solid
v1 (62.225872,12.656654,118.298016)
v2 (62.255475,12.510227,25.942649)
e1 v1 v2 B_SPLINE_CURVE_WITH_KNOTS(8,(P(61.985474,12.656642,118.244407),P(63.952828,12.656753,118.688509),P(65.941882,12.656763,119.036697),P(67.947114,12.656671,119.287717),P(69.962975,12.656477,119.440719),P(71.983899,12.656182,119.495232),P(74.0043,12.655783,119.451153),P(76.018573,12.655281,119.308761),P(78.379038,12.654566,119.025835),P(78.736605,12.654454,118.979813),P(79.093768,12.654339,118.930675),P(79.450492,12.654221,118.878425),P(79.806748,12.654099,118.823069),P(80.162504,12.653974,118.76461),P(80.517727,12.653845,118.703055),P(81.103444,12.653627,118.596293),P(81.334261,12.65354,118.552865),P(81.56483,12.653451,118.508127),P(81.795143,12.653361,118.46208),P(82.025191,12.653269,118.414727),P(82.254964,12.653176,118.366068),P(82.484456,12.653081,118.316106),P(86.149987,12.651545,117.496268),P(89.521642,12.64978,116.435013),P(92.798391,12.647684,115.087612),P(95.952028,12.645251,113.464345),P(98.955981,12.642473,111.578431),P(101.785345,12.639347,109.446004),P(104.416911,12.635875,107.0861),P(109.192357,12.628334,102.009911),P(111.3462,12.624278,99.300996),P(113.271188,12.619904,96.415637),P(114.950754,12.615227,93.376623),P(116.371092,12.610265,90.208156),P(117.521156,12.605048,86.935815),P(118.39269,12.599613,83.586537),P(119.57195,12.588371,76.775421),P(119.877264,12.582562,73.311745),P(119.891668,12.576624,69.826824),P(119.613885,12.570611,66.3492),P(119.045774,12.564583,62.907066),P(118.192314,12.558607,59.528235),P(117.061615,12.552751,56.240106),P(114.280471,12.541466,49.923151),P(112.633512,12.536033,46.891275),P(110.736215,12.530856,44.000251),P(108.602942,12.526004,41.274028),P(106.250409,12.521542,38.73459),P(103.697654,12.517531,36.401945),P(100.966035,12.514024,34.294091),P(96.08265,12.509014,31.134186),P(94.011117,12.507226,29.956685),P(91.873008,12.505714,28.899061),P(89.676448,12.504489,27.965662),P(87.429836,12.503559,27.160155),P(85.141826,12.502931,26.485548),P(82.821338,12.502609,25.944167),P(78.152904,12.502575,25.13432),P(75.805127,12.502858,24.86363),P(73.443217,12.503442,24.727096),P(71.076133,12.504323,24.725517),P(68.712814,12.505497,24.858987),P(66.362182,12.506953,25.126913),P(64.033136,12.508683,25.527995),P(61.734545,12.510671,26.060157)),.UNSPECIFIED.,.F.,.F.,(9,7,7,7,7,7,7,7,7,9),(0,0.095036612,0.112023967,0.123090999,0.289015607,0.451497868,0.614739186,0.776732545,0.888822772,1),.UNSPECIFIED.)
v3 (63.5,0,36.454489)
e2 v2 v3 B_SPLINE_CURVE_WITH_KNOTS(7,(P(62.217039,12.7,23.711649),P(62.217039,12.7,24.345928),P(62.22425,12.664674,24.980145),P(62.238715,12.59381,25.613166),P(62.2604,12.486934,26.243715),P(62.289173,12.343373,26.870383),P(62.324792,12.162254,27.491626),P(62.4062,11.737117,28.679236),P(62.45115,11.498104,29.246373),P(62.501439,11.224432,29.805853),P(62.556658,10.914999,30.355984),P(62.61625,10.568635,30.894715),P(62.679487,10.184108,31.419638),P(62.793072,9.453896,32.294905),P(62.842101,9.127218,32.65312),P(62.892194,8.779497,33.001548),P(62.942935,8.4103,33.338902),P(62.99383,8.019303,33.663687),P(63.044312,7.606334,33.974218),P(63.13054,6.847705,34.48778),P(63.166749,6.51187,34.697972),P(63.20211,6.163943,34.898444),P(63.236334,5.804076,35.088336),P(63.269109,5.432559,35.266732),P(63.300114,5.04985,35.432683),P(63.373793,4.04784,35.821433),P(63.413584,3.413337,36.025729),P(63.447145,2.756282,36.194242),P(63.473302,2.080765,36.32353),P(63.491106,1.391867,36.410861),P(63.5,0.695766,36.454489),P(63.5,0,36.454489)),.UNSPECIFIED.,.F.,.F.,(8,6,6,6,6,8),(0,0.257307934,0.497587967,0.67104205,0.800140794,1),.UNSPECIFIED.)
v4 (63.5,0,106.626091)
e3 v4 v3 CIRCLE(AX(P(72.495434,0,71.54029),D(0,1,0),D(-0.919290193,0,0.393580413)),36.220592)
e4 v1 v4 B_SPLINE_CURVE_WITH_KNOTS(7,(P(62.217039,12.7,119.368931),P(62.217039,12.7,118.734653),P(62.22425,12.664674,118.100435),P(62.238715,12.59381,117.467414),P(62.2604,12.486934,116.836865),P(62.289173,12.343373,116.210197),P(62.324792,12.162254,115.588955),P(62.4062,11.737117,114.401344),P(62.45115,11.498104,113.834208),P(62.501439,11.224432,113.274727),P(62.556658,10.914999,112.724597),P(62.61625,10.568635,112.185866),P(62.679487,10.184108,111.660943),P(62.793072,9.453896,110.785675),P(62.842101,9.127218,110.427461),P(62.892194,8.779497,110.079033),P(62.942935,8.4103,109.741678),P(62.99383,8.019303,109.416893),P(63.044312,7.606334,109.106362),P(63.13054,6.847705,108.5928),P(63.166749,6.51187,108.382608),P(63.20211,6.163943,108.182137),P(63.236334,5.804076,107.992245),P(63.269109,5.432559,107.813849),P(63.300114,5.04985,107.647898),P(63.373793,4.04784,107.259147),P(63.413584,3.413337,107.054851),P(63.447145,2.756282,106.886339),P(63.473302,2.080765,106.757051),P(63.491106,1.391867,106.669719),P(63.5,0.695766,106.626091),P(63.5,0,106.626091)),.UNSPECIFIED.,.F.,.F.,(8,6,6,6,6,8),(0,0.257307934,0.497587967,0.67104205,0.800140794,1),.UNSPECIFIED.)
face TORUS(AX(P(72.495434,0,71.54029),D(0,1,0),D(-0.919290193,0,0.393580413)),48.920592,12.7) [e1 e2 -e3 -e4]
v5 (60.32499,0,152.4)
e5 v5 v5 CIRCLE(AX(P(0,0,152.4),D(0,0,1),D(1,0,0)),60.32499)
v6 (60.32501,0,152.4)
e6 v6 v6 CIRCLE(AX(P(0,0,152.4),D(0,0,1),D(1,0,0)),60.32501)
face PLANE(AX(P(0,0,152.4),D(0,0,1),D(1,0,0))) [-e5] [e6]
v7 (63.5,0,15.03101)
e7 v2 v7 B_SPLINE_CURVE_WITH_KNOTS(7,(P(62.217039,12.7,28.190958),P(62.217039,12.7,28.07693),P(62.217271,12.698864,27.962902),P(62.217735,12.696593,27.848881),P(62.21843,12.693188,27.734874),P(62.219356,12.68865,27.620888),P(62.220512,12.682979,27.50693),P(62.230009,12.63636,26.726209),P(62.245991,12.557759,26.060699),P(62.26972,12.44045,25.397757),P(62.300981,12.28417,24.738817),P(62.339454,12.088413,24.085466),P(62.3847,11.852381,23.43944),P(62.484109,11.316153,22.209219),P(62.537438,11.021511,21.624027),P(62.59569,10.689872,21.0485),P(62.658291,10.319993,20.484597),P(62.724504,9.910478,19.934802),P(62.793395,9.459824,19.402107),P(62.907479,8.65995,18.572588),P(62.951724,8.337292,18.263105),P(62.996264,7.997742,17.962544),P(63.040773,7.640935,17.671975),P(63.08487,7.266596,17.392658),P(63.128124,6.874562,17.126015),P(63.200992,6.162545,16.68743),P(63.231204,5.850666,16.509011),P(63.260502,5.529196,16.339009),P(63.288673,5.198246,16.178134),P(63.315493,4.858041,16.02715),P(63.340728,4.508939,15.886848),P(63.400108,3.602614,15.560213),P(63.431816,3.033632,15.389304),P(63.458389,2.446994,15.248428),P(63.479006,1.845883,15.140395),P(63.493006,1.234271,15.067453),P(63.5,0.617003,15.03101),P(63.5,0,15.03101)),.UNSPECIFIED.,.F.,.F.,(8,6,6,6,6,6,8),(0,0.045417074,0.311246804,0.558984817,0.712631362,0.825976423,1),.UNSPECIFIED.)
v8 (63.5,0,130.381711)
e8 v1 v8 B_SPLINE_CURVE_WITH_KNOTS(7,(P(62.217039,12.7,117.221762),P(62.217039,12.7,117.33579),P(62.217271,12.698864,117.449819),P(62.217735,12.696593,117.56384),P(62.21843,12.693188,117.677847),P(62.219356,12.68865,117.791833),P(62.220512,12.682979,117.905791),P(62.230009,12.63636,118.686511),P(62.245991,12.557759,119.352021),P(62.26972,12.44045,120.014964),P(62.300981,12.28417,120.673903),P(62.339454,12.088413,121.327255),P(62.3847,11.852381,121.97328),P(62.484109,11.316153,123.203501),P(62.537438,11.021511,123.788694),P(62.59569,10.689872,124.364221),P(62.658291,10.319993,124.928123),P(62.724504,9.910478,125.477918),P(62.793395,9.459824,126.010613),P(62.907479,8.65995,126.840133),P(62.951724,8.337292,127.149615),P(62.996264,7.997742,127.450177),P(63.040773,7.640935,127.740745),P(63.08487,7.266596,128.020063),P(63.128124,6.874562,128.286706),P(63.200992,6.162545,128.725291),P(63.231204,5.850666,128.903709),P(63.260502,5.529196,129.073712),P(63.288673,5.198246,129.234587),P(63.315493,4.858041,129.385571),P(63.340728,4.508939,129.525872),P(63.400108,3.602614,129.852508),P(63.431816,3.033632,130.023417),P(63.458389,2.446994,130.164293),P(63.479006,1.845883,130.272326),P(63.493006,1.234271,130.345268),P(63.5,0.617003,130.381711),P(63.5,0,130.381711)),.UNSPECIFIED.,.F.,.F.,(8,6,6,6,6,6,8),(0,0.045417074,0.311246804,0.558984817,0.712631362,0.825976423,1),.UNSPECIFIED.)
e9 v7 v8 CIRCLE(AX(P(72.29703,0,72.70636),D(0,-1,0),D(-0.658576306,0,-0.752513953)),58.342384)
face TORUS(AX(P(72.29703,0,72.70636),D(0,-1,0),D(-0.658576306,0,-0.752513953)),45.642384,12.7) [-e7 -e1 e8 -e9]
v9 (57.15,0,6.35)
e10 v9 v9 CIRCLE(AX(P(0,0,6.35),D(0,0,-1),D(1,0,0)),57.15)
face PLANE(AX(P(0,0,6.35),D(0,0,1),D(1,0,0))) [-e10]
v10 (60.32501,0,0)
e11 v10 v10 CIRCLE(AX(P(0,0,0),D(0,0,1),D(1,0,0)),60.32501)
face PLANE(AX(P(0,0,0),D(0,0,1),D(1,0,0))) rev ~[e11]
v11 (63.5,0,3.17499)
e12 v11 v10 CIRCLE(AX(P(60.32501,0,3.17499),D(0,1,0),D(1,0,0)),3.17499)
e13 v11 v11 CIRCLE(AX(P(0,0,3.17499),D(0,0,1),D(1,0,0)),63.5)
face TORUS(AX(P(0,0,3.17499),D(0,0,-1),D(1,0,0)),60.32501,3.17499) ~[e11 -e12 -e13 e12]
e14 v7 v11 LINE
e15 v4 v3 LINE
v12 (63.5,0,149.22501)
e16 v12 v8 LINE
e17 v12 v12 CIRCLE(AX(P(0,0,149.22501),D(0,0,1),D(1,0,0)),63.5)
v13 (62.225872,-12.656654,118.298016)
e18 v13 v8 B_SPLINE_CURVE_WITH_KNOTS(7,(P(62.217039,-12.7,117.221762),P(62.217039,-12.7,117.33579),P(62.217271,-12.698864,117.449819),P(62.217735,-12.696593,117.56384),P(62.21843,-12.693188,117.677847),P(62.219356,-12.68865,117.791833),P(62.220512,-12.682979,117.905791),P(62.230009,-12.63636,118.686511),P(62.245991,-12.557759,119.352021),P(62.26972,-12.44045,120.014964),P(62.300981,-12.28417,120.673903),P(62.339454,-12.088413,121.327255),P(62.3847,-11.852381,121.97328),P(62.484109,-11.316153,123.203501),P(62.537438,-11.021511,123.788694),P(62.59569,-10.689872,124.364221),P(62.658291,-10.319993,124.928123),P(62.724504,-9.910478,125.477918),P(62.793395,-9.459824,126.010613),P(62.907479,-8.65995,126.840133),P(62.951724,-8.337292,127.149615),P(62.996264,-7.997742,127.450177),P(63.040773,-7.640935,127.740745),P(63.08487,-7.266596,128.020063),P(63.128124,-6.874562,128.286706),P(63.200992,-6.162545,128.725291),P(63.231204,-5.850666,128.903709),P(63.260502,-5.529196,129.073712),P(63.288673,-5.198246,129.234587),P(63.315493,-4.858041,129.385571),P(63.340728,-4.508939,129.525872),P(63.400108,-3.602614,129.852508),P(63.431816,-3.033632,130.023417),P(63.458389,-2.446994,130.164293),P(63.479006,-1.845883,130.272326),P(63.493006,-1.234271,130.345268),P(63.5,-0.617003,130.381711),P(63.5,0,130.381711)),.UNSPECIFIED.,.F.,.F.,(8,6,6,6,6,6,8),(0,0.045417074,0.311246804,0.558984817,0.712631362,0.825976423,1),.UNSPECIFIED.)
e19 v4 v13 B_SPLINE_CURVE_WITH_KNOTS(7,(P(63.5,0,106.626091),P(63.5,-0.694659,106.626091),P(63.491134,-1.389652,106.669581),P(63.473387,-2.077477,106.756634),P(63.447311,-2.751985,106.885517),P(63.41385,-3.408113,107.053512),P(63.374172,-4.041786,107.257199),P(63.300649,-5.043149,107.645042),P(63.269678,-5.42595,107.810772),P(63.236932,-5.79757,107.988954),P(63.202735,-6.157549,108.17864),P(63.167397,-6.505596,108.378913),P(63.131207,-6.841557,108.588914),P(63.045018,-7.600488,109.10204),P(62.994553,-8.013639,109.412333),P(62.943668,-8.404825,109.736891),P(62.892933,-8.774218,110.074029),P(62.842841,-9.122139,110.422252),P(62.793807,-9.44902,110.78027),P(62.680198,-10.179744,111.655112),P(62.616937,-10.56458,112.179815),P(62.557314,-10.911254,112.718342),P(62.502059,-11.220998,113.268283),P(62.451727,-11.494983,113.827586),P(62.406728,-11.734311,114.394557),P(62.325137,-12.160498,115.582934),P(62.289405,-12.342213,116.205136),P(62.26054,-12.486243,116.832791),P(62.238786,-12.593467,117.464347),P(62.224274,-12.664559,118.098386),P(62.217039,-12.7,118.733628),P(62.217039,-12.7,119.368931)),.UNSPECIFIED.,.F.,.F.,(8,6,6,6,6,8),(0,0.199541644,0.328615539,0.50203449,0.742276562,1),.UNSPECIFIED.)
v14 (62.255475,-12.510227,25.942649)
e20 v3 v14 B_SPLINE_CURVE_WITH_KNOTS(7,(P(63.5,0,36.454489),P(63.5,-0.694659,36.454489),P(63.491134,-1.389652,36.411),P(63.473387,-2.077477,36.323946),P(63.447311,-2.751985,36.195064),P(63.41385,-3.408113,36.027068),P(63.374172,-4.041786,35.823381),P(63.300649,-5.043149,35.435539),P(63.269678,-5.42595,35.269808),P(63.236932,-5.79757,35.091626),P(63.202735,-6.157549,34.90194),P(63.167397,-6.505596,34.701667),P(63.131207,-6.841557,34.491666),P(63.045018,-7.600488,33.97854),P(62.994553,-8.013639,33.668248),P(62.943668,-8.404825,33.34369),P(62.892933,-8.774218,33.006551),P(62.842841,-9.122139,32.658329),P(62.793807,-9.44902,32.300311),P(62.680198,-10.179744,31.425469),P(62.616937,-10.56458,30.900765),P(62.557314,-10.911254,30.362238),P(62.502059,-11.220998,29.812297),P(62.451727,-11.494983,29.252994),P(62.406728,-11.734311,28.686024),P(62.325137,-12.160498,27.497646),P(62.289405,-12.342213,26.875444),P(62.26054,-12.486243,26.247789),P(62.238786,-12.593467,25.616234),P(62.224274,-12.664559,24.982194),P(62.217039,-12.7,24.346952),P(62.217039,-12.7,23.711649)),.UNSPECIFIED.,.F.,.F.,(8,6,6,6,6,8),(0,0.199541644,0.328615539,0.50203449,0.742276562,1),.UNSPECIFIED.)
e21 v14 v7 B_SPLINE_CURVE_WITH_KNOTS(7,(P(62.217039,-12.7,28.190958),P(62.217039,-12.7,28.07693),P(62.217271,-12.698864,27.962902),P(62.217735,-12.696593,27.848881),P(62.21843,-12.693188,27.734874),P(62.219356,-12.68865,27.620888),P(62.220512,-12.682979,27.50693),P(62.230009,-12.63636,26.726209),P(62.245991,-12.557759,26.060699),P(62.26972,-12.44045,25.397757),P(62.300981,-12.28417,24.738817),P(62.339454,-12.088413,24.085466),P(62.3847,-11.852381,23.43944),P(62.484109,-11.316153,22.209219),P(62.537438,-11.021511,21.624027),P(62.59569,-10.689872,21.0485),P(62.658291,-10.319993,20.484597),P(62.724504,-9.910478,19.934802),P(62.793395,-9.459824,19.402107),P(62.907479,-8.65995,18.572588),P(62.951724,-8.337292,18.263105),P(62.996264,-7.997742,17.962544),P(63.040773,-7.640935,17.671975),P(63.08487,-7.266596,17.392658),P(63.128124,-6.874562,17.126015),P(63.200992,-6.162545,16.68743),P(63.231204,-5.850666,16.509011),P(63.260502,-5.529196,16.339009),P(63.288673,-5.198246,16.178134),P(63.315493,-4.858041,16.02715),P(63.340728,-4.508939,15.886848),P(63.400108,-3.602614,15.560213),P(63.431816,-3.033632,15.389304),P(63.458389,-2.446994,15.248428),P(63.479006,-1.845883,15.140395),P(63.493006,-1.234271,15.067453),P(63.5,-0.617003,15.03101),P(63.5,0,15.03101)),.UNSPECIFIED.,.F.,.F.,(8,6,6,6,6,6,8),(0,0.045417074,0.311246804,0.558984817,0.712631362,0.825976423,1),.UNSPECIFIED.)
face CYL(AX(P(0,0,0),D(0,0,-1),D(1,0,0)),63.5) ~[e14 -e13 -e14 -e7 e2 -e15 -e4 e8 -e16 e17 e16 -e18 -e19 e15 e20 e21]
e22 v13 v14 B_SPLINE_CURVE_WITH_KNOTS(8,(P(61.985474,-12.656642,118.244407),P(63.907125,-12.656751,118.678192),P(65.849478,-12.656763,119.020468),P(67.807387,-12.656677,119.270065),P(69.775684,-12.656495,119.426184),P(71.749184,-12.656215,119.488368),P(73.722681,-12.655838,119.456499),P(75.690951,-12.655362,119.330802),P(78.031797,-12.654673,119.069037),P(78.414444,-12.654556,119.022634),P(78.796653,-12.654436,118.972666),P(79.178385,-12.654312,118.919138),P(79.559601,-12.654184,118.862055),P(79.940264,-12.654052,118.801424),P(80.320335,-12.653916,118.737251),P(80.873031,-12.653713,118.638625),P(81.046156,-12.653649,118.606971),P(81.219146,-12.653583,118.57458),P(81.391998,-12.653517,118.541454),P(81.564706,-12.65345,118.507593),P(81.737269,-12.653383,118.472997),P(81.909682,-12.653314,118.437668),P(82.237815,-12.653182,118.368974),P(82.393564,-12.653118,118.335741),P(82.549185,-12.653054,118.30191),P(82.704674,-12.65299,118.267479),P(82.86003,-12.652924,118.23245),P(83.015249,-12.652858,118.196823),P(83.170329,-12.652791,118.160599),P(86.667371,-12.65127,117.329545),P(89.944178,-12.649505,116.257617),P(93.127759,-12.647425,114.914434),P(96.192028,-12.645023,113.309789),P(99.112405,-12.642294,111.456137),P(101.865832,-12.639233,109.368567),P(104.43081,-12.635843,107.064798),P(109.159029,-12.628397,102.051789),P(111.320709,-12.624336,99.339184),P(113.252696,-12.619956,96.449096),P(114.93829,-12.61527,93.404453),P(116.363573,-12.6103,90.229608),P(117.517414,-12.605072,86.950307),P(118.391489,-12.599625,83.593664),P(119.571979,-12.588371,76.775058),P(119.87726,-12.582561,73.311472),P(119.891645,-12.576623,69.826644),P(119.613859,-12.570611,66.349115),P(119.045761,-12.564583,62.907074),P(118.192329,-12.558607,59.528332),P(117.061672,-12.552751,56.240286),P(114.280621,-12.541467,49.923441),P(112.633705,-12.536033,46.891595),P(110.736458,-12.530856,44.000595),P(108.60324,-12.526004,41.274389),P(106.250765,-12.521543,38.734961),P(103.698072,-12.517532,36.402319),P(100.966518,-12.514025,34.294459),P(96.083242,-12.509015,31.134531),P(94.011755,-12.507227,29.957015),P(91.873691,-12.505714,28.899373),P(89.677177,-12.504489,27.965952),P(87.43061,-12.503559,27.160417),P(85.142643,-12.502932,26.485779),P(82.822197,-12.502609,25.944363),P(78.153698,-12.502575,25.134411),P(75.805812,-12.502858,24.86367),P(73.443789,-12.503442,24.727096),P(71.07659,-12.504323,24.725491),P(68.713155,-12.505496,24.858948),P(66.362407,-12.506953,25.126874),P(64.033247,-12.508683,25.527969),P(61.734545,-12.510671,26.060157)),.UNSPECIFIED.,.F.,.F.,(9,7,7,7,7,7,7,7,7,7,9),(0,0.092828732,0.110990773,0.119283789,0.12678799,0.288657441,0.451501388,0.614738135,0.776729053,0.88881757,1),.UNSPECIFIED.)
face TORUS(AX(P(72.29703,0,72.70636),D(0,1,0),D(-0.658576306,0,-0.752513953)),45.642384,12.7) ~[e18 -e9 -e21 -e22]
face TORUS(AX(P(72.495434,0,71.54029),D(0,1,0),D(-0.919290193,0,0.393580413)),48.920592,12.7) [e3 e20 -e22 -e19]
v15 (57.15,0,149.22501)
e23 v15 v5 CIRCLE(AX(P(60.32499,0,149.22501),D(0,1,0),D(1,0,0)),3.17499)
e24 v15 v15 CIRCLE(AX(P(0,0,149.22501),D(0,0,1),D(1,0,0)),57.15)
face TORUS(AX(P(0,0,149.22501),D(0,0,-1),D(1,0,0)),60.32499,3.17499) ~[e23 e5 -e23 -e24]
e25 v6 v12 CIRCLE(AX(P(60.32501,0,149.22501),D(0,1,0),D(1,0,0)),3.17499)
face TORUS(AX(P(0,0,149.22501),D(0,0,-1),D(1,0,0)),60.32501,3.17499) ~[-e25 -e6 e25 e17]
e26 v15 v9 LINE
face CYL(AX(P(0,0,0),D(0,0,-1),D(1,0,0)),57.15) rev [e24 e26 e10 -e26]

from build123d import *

# Parameters (mm, degrees)
F0_R         = 63.5
F2_DEPTH     = 152.4
F3_T         = -6.35
F4_DEPTH     = 12.7
F5_DEPTH     = 152.4
F6_T4_ANGLE  = 262.3827679328
F6_S5_R      = 63.5
F6_T6_DEPTH  = 84
F6_T10_ANGLE = 262.3827679328
F6_S11_R     = 63.5
F6_T12_DEPTH = 84
F6_T16_ANGLE = 313.645065155
F6_S17_R     = 63.5
F6_T18_DEPTH = 84
F6_T22_ANGLE = 313.645065155
F6_S23_R     = 63.5
F6_T24_DEPTH = 84
F7_R         = 3.17499


# Not quite as in the source:
# - a fillet or chamfer that OpenCascade refuses, or shapes differently, is made with other operations: its cross-section is extruded or revolved along the edge and cut away or added
# - a fillet or chamfer is up to 0.001 mm smaller than in the source, because OpenCascade refuses the exact size


with BuildPart() as f2:
    # F0 (on Top) → F2 (new body)
    with BuildSketch(Plane.XY):
        Circle(F0_R)
    extrude(amount=F2_DEPTH)

    # F3
    f3_openings = [f2.faces().sort_by_distance(p)[0] for p in [
        (0, 0, 152.4),
    ]]
    offset(amount=F3_T, openings=f3_openings)

    # F1 (on Front) → F4 (join, symmetric)
    with BuildSketch(Plane.XZ):
        with BuildLine():
            Line((49.501311034, 43.5545518994), (49.501311034, 19.0017146287))
            ThreePointArc((49.501311034, 19.0017146287), (130.6394136759, 72.7063623934), (49.5013073087, 126.4110045299))
            Line((49.5013073087, 126.4110045299), (49.5013073087, 99.5260253549))
            ThreePointArc((49.5013073087, 99.5260253549), (108.7160258507, 71.5402925683), (49.501311034, 43.5545518994))
        make_face()
    extrude(amount=F4_DEPTH, both=True)

    # F5 (cut): a face of the model
    f5_faces = [f2.faces().sort_by_distance(p)[0] for p in [
        (0, 0, 6.35),
    ]]
    extrude(f5_faces, amount=F5_DEPTH, mode=Mode.SUBTRACT)

    # F6: fillet of radius 12.7 on 4 edges, made by hand


with BuildPart() as f6_tool2:
    # F6_s3 → F6_t4 (revolve)
    with BuildSketch(Plane(origin=(4.9077736373, 0, -4.2951275785), x_dir=(0, 1, 0), z_dir=(-0.7525139529, 0, 0.6585763059))):
        with BuildLine():
            ThreePointArc((-12.7, -56.6832774583), (-8.9802561211, -47.7030213372), (0, -43.9832774583))
            Line((0, -43.9832774583), (0, -43.7292774583))
            Line((0, -43.7292774583), (-12.954, -43.7292774583))
            Line((-12.954, -43.7292774583), (-12.954, -56.6832774583))
            Line((-12.954, -56.6832774583), (-12.7, -56.6832774583))
        make_face()
    revolve(axis=Axis((72.2970297265, -12.7, 72.7063603699), (0, -1, 0)), revolution_arc=F6_T4_ANGLE)

    # F6_s5 → F6_t6 (cut, symmetric)
    with BuildSketch(Plane.XY.offset(72.7)):
        Circle(F6_S5_R)
    extrude(amount=F6_T6_DEPTH, both=True, mode=Mode.SUBTRACT)


with BuildPart() as f2_1:
    add(f2.part)

    # F6_t1: cut F6_tool2
    add(f6_tool2.part, mode=Mode.SUBTRACT)


with BuildPart() as f6_tool8:
    # F6_s9 → F6_t10 (revolve)
    with BuildSketch(Plane(origin=(4.9077736373, 0, -4.2951275785), x_dir=(0, 1, 0), z_dir=(-0.7525139529, 0, 0.6585763059))):
        with BuildLine():
            ThreePointArc((12.7, -56.6832774583), (8.9802561211, -47.7030213372), (0, -43.9832774583))
            Line((0, -43.9832774583), (0, -43.7292774583))
            Line((0, -43.7292774583), (12.954, -43.7292774583))
            Line((12.954, -43.7292774583), (12.954, -56.6832774583))
            Line((12.954, -56.6832774583), (12.7, -56.6832774583))
        make_face()
    revolve(axis=Axis((72.2970297265, 12.7, 72.7063603699), (0, -1, 0)), revolution_arc=F6_T10_ANGLE)

    # F6_s11 → F6_t12 (cut, symmetric)
    with BuildSketch(Plane.XY.offset(72.7)):
        Circle(F6_S11_R)
    extrude(amount=F6_T12_DEPTH, both=True, mode=Mode.SUBTRACT)


with BuildPart() as f2_2:
    add(f2_1.part)

    # F6_t7: cut F6_tool8
    add(f6_tool8.part, mode=Mode.SUBTRACT)


with BuildPart() as f6_tool14:
    # F6_s15 → F6_t16 (revolve)
    with BuildSketch(Plane(origin=(37.1142669501, 0, 86.6882103357), x_dir=(0, 1, 0), z_dir=(-0.3935804129, 0, -0.9192901928))):
        with BuildLine():
            ThreePointArc((0, 2.2668933091), (-8.9802561211, -1.4528505698), (-12.7, -10.4331066909))
            Line((-12.7, -10.4331066909), (-12.954, -10.4331066909))
            Line((-12.954, -10.4331066909), (-12.954, 2.5208933091))
            Line((-12.954, 2.5208933091), (0, 2.5208933091))
            Line((0, 2.5208933091), (0, 2.2668933091))
        make_face()
    revolve(axis=Axis((72.495434314, -12.7, 71.5402901576), (0, 1, 0)), revolution_arc=F6_T16_ANGLE)

    # F6_s17 → F6_t18 (cut, symmetric)
    with BuildSketch(Plane.XY.offset(71.5)):
        Circle(F6_S17_R)
    extrude(amount=F6_T18_DEPTH, both=True, mode=Mode.SUBTRACT)


with BuildPart() as f2_3:
    add(f2_2.part)

    # F6_t13: cut F6_tool14
    add(f6_tool14.part, mode=Mode.SUBTRACT)


with BuildPart() as f6_tool20:
    # F6_s21 → F6_t22 (revolve)
    with BuildSketch(Plane(origin=(37.1142669501, 0, 86.6882103357), x_dir=(0, 1, 0), z_dir=(-0.3935804129, 0, -0.9192901928))):
        with BuildLine():
            ThreePointArc((12.7, -10.4331066909), (8.9802561211, -1.4528505698), (0, 2.2668933091))
            Line((0, 2.2668933091), (0, 2.5208933091))
            Line((0, 2.5208933091), (12.954, 2.5208933091))
            Line((12.954, 2.5208933091), (12.954, -10.4331066909))
            Line((12.954, -10.4331066909), (12.7, -10.4331066909))
        make_face()
    revolve(axis=Axis((72.495434314, 12.7, 71.5402901576), (0, 1, 0)), revolution_arc=F6_T22_ANGLE)

    # F6_s23 → F6_t24 (cut, symmetric)
    with BuildSketch(Plane.XY.offset(71.5)):
        Circle(F6_S23_R)
    extrude(amount=F6_T24_DEPTH, both=True, mode=Mode.SUBTRACT)


with BuildPart() as f2_4:
    add(f2_3.part)

    # F6_t19: cut F6_tool20
    add(f6_tool20.part, mode=Mode.SUBTRACT)

    # F7 (radius 3.175 in the source; OpenCascade refuses exactly that, so slightly less here)
    f7_edges = [f2_4.edges().sort_by_distance(p)[0] for p in [
        (-63.5, 0, 152.4),
        (-57.15, 0, 152.4),
        (-63.5, 0, 0),
    ]]
    fillet(f7_edges, radius=F7_R)


solid = f2_4.part
